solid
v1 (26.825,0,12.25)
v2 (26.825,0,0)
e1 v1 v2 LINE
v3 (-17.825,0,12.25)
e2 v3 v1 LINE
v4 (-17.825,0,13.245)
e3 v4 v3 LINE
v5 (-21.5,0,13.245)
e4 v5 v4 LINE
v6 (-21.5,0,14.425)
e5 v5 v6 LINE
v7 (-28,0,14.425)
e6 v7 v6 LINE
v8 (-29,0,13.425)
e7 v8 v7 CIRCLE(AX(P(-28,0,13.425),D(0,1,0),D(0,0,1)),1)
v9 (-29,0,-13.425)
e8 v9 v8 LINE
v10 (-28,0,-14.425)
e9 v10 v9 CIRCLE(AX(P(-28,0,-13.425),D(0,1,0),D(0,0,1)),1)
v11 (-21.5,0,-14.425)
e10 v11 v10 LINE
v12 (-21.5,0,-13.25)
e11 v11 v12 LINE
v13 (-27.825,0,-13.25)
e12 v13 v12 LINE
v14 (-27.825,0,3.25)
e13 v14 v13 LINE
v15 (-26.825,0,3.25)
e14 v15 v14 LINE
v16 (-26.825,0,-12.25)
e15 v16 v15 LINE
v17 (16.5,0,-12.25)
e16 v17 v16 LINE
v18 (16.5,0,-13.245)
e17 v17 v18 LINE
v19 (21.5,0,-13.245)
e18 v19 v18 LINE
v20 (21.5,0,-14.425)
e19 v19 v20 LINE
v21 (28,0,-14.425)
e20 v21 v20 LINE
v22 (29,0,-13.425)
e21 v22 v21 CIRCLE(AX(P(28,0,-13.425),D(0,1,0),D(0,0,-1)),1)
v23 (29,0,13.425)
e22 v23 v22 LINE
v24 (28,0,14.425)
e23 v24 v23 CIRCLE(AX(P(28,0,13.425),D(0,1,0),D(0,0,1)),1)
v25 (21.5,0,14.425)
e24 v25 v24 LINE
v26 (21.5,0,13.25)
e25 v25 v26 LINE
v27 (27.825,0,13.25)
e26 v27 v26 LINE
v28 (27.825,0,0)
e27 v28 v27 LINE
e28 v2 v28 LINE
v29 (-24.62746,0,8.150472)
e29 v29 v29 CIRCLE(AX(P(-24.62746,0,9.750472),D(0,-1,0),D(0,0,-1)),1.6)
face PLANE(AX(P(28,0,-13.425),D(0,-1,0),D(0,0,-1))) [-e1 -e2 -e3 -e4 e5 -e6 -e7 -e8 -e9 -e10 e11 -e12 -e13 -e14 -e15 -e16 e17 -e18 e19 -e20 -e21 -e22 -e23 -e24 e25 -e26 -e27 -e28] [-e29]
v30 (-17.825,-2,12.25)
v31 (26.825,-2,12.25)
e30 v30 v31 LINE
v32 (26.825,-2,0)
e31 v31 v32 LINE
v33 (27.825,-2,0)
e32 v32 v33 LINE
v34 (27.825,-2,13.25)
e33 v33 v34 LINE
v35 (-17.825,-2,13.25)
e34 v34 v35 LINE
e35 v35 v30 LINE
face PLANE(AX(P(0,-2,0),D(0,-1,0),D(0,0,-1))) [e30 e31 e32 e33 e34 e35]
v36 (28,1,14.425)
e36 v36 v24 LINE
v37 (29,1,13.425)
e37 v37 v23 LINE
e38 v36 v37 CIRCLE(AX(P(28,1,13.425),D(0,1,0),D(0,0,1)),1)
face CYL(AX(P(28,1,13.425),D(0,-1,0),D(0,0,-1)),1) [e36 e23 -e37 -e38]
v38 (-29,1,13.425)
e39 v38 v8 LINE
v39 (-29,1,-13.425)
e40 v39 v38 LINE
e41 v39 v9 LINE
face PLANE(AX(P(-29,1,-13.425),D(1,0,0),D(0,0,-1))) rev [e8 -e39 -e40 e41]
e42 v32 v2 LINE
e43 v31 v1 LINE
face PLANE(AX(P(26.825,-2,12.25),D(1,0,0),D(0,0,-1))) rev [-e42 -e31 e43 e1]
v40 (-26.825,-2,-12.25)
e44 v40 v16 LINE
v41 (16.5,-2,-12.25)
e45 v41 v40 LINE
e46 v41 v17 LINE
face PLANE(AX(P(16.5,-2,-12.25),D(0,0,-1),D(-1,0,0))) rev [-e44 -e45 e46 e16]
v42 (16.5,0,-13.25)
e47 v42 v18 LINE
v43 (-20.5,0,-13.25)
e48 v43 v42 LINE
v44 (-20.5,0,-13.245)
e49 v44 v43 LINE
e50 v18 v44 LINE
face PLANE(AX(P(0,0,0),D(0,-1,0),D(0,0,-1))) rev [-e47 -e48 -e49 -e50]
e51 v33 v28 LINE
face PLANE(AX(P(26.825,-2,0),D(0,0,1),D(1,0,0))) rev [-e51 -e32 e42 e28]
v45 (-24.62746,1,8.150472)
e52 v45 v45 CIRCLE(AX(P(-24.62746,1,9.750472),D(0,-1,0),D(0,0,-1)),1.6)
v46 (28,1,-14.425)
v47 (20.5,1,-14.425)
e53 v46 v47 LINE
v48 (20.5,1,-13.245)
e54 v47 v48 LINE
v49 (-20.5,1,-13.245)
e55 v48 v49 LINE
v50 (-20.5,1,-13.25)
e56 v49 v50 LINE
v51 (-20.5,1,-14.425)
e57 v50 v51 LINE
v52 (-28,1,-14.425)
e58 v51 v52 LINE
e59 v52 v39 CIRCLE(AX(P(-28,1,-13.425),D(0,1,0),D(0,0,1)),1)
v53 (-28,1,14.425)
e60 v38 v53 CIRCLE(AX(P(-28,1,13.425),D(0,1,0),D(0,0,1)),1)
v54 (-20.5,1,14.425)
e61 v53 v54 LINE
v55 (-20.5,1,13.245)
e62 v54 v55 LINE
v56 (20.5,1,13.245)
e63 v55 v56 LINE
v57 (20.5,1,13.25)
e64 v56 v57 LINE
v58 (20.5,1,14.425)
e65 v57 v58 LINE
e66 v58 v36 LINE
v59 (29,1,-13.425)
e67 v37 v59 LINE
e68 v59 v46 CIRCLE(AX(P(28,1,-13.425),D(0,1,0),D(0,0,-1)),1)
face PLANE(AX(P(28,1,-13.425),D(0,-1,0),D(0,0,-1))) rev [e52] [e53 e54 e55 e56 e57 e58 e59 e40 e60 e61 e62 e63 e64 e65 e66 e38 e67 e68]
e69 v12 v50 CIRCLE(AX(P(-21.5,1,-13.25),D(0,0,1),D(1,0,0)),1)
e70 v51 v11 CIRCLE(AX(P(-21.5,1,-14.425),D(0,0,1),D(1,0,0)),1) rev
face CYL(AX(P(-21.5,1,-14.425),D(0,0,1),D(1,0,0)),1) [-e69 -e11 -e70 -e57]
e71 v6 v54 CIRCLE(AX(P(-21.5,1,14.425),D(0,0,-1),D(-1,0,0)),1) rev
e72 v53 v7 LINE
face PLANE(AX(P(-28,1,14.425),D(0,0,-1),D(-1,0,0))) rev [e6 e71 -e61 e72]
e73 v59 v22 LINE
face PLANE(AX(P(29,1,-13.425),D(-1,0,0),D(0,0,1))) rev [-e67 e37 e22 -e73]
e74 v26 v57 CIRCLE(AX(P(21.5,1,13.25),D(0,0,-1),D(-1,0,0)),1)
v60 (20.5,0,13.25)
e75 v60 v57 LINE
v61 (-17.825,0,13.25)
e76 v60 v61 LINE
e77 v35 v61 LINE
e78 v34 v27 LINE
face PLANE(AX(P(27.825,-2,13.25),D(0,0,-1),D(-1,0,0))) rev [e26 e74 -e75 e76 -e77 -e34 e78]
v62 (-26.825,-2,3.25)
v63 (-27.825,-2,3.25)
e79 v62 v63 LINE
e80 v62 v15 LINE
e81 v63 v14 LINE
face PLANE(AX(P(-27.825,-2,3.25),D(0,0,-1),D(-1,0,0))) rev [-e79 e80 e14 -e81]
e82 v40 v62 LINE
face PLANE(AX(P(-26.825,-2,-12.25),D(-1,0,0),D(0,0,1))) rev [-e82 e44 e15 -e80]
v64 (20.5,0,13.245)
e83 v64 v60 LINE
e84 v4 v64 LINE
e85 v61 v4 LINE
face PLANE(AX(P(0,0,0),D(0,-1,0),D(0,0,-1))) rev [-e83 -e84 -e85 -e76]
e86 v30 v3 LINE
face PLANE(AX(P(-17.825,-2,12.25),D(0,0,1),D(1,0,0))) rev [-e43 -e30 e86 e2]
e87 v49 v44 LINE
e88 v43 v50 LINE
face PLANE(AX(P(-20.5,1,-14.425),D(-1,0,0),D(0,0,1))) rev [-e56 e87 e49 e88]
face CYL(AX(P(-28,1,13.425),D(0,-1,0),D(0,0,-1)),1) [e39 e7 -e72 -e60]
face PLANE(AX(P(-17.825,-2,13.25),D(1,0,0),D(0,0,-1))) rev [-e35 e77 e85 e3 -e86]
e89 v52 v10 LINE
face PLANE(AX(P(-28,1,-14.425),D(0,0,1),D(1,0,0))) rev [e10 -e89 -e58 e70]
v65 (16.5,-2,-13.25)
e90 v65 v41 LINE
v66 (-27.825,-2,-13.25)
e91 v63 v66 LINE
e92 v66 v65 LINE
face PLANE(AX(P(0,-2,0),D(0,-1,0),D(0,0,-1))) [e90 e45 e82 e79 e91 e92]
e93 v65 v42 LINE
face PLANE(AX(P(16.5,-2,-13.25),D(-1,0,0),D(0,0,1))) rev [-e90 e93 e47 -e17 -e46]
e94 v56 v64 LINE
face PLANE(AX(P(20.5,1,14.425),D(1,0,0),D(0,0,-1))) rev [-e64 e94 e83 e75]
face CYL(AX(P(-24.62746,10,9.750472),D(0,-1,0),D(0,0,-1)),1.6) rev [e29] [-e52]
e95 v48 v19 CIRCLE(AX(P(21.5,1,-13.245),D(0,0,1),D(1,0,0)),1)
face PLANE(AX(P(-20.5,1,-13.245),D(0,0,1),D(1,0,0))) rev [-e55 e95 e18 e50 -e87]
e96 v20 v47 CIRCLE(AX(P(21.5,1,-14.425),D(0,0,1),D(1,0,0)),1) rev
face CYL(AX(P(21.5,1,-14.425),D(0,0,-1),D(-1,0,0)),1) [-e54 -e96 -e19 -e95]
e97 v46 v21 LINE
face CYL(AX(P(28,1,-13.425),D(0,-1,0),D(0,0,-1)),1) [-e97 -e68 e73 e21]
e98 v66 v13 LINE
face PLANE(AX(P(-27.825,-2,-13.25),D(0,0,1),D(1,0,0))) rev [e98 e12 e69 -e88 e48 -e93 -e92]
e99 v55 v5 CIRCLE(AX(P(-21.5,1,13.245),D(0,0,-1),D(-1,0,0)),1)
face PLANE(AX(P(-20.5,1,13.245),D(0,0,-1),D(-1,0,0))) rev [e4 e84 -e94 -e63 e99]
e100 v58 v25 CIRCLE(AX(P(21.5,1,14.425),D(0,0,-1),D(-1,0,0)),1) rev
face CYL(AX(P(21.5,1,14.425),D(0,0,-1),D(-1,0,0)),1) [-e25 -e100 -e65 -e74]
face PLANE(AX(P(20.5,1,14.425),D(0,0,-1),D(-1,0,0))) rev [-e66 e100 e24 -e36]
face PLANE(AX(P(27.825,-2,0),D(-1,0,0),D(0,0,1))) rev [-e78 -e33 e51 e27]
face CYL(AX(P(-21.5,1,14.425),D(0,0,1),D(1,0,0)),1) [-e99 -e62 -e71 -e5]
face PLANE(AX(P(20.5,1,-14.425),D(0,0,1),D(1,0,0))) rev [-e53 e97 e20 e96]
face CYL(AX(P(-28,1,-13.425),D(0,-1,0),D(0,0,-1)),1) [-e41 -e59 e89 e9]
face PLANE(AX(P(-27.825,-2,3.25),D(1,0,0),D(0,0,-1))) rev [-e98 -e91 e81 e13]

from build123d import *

# Parameters (mm, degrees)
BOSS_EXTRUDE10_DEPTH = 1
BOSS_EXTRUDE11_DEPTH = 2
FILLET1_R            = 1
SKETCH22_R           = 1.6
CUT_EXTRUDE1_DEPTH   = 10


with BuildPart() as part:
    # Sketch20 → Boss-Extrude10 (new body)
    with BuildSketch(Plane(origin=(0, 0, 0), x_dir=(1, 0, 0), z_dir=(0, 1, 0))):
        with BuildLine():
            Line((-28, 14.425), (-20.5, 14.425))
            Line((-20.5, 14.425), (-20.5, 13.245))
            Line((-20.5, 13.245), (20.5, 13.245))
            Line((20.5, 13.245), (20.5, 14.425))
            Line((20.5, 14.425), (28, 14.425))
            ThreePointArc((28, 14.425), (28.707106781, 14.132106781), (29, 13.425))
            Line((29, 13.425), (29, -13.425))
            ThreePointArc((29, -13.425), (28.707106781, -14.132106781), (28, -14.425))
            Line((28, -14.425), (20.5, -14.425))
            Line((20.5, -14.425), (20.5, -13.245))
            Line((20.5, -13.245), (-20.5, -13.245))
            Line((-20.5, -13.245), (-20.5, -14.425))
            Line((-20.5, -14.425), (-28, -14.425))
            ThreePointArc((-28, -14.425), (-28.707106781, -14.132106781), (-29, -13.425))
            Line((-29, -13.425), (-29, 13.425))
            ThreePointArc((-29, 13.425), (-28.707106781, 14.132106781), (-28, 14.425))
        make_face()
    extrude(amount=BOSS_EXTRUDE10_DEPTH)

    # Sketch21 → Boss-Extrude11 (add)
    with BuildSketch(Plane.XZ):
        Polygon((-27.825, 3.25), (-26.825, 3.25), (-26.825, -12.25), (16.5, -12.25), (16.5, -13.25), (-27.825, -13.25), align=None)
        Polygon((-17.825, 13.25), (-17.825, 12.25), (26.825, 12.25), (26.825, 0), (27.825, 0), (27.825, 13.25), align=None)
    extrude(amount=BOSS_EXTRUDE11_DEPTH)

    # Fillet1
    fillet1_edges = [part.edges().sort_by_distance(p)[0] for p in [
        (-20.5, 0, -13.8375),
        (20.5, 0, -13.835),
        (20.5, 0, 13.8375),
        (-20.5, 0, 13.835),
    ]]
    fillet(fillet1_edges, radius=FILLET1_R - 0.0001)  # a hair under: the kernel refuses the full size

    # Sketch22 → Cut-Extrude1 (cut)
    with BuildSketch(Plane.XZ):
        with Locations(Location((-24.627459856, 9.750471763, 0), (0, 0, 270))):
            Circle(SKETCH22_R)
    extrude(amount=-CUT_EXTRUDE1_DEPTH, mode=Mode.SUBTRACT)


solid = part.part
